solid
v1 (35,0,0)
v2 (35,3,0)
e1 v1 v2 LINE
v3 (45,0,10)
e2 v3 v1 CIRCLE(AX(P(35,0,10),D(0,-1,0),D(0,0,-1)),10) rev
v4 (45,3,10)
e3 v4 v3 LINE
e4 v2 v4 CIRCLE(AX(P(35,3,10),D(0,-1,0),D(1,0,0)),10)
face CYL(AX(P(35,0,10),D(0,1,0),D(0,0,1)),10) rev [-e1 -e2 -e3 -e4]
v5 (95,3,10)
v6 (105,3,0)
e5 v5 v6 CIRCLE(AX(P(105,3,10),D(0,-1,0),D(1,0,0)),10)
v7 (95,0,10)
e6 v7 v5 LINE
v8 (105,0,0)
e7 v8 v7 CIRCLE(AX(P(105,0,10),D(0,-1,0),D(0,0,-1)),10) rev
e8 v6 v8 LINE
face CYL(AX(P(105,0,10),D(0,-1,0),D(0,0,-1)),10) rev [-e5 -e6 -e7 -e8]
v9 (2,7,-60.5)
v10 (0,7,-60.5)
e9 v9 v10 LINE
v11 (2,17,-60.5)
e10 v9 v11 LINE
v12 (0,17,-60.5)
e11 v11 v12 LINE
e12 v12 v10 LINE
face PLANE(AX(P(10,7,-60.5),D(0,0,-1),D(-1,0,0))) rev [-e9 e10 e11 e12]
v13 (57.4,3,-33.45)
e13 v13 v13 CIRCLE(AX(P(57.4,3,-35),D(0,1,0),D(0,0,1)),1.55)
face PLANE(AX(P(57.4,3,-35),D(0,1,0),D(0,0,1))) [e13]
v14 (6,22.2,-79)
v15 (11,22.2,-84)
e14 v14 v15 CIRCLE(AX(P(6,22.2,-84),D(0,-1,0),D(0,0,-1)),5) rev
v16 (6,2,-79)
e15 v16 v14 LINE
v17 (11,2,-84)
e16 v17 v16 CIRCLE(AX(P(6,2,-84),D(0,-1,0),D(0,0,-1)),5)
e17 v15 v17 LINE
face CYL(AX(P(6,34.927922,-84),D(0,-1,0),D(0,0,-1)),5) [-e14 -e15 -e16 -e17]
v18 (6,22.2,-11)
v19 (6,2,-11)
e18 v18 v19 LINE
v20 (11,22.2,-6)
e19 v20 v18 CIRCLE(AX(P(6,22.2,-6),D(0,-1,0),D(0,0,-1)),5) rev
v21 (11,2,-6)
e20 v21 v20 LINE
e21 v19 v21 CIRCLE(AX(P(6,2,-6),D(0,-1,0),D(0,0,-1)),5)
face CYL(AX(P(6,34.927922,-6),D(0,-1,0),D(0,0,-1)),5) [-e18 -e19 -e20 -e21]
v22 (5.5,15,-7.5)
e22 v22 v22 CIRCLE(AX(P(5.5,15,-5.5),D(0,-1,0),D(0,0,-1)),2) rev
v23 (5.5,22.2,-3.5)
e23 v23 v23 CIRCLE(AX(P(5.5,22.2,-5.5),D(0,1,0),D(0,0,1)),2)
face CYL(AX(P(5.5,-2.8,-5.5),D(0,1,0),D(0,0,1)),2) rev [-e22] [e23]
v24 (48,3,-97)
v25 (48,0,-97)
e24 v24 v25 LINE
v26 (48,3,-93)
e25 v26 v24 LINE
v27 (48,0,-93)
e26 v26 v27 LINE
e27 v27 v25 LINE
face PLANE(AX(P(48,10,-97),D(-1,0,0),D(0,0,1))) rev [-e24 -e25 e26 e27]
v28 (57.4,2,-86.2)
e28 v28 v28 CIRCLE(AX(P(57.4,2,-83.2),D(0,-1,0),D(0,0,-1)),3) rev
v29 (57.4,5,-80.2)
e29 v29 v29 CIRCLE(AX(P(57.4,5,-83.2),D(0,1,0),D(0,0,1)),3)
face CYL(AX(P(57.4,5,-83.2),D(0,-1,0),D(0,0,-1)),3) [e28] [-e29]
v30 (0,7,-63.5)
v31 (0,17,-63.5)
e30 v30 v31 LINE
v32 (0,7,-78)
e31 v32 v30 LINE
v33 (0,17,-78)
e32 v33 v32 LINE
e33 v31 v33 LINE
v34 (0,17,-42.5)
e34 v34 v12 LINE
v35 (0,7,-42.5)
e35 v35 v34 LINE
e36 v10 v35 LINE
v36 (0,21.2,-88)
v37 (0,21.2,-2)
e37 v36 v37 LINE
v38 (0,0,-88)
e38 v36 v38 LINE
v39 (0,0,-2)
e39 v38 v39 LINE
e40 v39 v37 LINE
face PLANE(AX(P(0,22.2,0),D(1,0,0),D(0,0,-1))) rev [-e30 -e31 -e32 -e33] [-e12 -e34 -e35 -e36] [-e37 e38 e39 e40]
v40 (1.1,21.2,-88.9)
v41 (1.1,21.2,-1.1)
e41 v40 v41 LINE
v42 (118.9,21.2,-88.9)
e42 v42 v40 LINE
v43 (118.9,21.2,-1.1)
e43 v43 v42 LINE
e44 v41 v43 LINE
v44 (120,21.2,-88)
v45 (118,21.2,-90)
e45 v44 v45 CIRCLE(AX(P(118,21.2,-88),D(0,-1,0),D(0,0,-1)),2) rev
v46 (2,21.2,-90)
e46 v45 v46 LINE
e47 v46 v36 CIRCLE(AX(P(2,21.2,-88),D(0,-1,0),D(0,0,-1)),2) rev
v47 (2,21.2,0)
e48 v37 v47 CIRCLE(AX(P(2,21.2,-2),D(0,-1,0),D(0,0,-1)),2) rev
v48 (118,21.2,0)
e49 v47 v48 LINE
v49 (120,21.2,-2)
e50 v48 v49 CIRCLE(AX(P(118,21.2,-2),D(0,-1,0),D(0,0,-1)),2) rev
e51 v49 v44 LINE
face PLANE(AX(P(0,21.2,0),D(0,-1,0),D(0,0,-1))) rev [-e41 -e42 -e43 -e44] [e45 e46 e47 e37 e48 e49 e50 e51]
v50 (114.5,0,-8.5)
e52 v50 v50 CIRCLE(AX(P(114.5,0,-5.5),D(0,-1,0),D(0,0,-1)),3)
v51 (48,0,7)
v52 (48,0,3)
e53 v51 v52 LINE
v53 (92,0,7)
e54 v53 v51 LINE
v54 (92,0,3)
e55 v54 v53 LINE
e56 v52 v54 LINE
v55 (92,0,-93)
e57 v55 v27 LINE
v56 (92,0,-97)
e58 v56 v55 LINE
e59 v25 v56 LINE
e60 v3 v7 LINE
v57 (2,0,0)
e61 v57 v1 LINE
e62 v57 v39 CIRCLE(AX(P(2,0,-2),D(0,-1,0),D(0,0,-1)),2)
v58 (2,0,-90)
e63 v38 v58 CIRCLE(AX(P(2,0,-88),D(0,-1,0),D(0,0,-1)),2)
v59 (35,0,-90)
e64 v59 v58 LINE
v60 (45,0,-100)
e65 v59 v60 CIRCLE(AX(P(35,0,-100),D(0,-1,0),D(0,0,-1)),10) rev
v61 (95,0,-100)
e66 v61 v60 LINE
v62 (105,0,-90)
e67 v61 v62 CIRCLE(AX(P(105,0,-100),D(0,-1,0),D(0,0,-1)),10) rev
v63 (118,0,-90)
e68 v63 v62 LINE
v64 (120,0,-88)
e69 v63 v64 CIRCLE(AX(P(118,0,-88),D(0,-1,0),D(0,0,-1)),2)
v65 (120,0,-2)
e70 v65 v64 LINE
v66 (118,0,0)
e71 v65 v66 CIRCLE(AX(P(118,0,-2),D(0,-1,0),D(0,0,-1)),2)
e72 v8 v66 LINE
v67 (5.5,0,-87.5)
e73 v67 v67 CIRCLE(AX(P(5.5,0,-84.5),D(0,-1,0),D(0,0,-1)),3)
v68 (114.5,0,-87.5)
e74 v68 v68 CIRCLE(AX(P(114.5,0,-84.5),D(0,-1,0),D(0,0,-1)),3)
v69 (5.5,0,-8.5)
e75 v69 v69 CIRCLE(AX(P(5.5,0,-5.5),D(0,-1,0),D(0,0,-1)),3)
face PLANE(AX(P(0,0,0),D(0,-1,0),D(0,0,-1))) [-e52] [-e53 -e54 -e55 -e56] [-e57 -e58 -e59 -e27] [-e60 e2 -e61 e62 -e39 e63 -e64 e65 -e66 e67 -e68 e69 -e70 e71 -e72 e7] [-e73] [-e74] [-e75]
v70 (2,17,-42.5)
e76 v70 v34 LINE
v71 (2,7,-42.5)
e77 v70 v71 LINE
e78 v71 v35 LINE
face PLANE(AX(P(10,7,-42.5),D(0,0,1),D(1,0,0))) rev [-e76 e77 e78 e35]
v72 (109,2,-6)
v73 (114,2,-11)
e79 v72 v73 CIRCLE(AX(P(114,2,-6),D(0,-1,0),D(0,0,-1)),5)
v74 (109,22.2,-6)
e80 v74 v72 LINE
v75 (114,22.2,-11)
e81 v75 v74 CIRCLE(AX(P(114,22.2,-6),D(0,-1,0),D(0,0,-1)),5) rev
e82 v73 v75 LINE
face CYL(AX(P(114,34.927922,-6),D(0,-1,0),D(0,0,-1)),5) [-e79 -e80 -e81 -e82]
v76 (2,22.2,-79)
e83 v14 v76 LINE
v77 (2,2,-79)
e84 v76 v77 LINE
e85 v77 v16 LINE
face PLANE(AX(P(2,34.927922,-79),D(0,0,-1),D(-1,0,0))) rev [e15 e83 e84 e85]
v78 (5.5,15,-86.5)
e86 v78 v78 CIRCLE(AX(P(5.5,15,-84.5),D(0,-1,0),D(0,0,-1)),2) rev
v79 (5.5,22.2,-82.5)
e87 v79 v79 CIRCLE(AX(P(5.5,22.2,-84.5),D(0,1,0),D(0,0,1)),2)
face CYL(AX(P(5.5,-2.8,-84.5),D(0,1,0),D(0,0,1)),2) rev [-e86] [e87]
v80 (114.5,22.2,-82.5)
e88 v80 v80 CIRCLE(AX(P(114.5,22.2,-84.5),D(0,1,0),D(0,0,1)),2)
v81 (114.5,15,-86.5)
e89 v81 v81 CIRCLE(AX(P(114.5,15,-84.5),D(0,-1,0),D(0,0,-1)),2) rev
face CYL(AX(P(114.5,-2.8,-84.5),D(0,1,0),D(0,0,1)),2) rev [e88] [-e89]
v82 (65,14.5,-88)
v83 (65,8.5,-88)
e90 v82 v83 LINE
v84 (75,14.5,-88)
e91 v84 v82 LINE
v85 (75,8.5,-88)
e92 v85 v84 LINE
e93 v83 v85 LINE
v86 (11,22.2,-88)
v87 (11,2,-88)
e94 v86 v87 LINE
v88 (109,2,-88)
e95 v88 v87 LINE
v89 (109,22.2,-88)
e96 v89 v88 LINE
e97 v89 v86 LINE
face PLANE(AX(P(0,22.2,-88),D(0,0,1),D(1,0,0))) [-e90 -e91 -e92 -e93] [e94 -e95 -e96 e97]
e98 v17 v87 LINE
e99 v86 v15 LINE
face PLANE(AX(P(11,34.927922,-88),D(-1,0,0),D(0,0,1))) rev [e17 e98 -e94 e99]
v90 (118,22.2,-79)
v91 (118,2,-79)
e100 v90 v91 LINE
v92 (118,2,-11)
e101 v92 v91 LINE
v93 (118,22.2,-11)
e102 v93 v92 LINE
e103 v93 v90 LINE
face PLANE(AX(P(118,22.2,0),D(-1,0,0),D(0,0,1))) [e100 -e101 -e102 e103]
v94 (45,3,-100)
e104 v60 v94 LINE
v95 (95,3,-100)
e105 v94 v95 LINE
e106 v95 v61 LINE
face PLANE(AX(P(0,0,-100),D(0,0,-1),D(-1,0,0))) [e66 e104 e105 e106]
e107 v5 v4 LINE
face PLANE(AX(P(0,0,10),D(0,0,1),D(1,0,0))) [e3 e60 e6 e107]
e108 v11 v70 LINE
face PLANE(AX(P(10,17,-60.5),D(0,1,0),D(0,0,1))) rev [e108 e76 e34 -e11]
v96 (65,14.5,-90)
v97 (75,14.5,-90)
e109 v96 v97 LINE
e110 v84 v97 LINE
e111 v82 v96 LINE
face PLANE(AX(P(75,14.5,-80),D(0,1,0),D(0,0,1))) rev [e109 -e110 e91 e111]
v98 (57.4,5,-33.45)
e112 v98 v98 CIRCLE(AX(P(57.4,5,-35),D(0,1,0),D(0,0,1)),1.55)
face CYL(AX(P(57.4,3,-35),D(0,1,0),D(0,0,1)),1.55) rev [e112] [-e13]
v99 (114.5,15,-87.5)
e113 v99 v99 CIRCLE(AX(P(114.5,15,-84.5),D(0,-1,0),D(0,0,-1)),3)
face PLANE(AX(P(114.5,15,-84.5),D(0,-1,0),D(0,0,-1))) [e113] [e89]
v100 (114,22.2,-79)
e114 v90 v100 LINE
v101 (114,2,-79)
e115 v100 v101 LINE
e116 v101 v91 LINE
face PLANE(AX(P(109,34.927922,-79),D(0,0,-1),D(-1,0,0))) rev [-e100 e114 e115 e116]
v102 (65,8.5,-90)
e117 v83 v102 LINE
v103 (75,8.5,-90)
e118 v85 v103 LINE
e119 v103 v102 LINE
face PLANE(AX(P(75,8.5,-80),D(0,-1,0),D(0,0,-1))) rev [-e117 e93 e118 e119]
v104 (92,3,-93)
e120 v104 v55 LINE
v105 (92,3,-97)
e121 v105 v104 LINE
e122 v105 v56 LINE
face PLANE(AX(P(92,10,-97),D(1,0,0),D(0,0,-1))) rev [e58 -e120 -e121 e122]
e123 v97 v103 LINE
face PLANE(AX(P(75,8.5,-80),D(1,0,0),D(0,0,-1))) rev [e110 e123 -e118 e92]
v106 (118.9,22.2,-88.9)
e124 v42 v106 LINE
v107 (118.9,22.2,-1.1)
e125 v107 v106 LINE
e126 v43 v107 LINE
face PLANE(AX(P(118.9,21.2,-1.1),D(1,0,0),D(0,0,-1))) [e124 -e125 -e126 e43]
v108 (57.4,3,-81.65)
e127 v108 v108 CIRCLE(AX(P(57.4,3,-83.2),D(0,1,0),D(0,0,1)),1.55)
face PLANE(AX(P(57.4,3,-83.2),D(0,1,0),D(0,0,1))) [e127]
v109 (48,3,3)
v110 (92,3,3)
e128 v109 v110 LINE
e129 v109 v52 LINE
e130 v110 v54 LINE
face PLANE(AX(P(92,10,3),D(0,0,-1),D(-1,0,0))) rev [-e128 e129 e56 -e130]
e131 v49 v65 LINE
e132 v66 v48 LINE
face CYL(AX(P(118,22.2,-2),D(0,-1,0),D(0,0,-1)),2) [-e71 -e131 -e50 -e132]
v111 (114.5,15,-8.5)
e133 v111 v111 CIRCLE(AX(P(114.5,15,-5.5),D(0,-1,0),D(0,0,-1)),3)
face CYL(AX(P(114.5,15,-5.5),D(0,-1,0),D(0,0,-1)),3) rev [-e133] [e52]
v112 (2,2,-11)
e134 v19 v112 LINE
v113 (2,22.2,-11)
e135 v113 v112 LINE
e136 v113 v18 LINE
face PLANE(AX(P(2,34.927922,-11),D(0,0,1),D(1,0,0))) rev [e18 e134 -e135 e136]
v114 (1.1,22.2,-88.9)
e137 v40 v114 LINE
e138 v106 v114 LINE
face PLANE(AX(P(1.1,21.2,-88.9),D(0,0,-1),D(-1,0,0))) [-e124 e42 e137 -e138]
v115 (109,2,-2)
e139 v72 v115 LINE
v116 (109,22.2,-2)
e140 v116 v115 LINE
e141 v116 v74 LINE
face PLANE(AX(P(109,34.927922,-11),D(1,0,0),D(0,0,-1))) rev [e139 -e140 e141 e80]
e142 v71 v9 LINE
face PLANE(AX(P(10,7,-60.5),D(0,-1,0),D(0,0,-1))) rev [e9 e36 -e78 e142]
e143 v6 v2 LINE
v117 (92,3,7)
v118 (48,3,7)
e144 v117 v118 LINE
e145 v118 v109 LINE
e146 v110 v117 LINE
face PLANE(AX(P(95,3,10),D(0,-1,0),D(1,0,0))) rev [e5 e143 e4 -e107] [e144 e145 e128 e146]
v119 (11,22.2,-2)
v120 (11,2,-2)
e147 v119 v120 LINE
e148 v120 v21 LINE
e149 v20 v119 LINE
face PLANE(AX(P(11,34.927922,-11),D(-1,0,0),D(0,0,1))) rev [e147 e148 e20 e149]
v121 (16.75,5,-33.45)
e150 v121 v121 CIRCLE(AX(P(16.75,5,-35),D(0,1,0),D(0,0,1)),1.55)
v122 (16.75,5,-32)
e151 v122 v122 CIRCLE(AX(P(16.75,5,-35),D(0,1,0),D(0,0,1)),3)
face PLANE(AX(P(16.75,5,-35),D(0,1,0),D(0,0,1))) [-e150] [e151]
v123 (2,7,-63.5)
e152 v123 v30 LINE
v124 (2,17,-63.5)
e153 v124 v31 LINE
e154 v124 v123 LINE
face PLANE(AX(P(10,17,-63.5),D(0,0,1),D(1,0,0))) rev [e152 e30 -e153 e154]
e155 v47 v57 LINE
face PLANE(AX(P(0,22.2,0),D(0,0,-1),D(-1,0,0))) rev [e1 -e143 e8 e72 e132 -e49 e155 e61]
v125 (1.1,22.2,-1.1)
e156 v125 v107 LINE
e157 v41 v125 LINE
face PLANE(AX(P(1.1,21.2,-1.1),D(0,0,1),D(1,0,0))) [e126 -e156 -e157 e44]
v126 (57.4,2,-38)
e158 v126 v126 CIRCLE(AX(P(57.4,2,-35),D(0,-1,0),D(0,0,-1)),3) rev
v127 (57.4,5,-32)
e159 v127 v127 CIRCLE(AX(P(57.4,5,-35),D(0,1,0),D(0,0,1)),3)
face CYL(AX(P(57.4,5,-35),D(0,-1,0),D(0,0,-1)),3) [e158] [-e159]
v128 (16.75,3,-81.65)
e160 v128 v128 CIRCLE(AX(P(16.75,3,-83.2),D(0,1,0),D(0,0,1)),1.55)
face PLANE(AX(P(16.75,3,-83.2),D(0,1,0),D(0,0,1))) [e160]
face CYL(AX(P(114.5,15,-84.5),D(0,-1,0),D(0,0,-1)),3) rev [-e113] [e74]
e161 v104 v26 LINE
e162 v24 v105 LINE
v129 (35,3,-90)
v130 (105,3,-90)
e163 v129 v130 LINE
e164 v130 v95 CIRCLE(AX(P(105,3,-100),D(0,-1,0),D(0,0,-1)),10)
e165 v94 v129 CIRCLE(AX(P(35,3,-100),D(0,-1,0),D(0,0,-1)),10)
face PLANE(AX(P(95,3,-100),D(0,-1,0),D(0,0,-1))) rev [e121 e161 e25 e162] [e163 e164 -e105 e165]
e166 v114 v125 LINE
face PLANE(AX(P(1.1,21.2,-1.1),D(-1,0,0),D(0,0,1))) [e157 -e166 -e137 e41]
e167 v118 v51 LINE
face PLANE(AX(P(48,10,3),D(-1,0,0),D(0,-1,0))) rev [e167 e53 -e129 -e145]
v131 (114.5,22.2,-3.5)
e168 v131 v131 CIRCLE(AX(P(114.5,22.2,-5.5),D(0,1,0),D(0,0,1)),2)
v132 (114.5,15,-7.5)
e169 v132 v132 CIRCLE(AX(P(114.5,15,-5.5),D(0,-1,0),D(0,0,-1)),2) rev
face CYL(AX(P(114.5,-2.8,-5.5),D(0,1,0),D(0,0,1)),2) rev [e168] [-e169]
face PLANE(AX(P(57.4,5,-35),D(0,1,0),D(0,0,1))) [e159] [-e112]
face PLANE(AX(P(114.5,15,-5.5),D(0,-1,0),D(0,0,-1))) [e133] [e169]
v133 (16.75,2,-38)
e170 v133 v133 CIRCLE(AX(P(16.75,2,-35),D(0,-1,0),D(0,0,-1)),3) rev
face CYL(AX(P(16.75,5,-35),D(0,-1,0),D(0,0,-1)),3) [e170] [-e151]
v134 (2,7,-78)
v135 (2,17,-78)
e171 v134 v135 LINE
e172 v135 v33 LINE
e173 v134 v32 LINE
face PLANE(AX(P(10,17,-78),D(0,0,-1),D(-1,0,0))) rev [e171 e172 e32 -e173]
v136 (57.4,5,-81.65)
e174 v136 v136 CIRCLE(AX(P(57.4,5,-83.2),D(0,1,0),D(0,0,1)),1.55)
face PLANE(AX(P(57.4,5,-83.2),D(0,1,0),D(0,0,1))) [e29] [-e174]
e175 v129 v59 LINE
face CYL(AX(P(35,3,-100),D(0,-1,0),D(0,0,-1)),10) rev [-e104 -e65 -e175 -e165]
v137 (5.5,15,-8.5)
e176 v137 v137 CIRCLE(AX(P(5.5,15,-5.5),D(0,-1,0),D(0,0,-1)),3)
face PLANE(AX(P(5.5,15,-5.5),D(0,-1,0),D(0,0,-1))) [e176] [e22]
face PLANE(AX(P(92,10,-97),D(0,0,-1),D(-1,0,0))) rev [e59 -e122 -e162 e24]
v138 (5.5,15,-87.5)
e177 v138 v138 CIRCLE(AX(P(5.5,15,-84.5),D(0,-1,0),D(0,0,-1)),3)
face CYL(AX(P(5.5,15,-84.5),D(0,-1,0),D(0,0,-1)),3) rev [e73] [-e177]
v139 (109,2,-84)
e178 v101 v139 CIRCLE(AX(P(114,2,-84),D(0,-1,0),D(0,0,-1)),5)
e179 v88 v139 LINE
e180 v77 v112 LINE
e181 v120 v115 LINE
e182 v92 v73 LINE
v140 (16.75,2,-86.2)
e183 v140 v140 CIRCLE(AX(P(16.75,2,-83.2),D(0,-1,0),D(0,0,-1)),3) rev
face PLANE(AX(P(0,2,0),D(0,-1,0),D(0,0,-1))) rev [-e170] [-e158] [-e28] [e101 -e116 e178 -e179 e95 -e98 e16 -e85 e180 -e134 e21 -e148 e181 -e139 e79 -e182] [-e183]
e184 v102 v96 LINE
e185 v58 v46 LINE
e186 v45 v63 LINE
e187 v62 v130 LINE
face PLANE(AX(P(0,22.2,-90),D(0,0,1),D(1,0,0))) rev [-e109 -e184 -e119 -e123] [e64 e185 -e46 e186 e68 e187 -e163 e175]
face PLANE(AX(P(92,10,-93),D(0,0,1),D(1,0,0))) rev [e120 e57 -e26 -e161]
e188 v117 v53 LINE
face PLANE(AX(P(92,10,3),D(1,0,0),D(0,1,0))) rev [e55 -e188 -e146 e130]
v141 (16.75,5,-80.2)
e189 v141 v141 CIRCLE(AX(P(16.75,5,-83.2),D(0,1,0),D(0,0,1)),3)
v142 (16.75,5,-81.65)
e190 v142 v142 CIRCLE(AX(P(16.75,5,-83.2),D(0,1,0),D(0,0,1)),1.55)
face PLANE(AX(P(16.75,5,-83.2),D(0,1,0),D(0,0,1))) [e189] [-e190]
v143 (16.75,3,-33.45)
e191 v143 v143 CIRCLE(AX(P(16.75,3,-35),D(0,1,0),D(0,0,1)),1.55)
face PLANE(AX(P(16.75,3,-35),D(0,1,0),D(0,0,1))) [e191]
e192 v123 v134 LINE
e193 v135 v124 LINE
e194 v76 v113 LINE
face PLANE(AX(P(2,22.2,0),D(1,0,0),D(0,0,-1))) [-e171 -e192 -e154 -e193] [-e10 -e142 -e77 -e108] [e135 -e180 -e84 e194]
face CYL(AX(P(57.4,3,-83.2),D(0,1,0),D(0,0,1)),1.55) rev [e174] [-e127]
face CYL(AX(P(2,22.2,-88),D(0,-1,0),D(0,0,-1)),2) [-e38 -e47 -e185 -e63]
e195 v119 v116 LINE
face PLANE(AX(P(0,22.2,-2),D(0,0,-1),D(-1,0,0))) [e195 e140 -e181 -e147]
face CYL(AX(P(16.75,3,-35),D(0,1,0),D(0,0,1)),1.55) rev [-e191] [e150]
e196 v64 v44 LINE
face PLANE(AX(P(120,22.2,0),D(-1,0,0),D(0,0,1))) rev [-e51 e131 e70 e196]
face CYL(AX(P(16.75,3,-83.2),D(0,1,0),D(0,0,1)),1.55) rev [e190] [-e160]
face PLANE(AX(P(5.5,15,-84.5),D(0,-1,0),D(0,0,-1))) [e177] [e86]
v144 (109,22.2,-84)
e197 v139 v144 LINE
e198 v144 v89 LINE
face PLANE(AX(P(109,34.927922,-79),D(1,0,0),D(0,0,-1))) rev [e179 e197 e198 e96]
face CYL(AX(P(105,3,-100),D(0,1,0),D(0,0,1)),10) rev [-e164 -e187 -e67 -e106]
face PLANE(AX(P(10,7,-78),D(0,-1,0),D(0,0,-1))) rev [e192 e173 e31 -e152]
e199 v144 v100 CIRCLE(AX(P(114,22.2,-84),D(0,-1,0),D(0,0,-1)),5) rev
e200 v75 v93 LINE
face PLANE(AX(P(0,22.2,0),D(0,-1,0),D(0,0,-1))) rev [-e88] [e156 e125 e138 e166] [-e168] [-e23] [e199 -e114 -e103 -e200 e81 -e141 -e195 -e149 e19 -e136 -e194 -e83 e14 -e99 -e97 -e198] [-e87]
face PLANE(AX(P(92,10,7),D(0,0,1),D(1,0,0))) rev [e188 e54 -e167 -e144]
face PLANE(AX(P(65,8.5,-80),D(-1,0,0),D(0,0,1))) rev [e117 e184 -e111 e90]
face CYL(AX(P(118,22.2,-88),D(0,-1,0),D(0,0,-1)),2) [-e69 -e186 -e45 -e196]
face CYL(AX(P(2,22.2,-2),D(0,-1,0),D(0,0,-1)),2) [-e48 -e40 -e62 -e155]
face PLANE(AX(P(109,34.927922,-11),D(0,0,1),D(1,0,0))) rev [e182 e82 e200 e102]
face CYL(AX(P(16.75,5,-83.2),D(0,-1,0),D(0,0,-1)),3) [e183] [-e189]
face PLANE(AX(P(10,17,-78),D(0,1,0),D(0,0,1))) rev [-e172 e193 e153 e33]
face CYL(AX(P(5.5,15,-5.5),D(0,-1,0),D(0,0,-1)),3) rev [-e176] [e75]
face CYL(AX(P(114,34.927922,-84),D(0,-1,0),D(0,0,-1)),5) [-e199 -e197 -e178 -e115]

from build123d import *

# Parameters (mm, degrees)
SKETCH1_W           = 120
SKETCH1_H           = 90
BOSS_EXTRUDE1_DEPTH = 22.2
SHELL1_T            = -2
SKETCH2_W           = 9
SKETCH2_H           = 9
BOSS_EXTRUDE2_DEPTH = 20.2
SKETCH5_W           = 120
SKETCH5_H           = 90
SKETCH5_W_2         = 117.8
SKETCH5_H_2         = 87.8
CUT_EXTRUDE2_DEPTH  = 1
SKETCH6_R           = 2
CUT_EXTRUDE3_DEPTH  = 25
SKETCH13_R          = 3
CUT_EXTRUDE8_DEPTH  = 15
SKETCH14_W          = 50
SKETCH14_H          = 3
BOSS_EXTRUDE4_DEPTH = 10
SKETCH15_W          = 44
SKETCH15_H          = 4
CUT_EXTRUDE9_DEPTH  = 10
SKETCH16_W          = 50
SKETCH16_H          = 3
BOSS_EXTRUDE5_DEPTH = 10
SKETCH17_W          = 44
SKETCH17_H          = 4
CUT_EXTRUDE10_DEPTH = 10
SKETCH22_W          = 14.5
SKETCH22_H          = 10
SKETCH22_W_2        = 18
CUT_EXTRUDE15_DEPTH = 10
SKETCH23_W          = 10
SKETCH23_H          = 6
CUT_EXTRUDE16_DEPTH = 10
FILLET1_R           = 10
FILLET4_R           = 5
FILLET9_R           = 2
SKETCH26_R          = 3
BOSS_EXTRUDE7_DEPTH = 3
SKETCH27_R          = 1.55
CUT_EXTRUDE17_DEPTH = 2


with BuildPart() as part:
    # Sketch1 → Boss-Extrude1 (new body)
    with BuildSketch(Plane(origin=(0, 0, 0), x_dir=(1, 0, 0), z_dir=(0, 1, 0))):
        with Locations((60, 45)):
            Rectangle(SKETCH1_W, SKETCH1_H)
    extrude(amount=BOSS_EXTRUDE1_DEPTH)

    # Shell1
    shell1_openings = [part.faces().sort_by_distance(p)[0] for p in [
        (60, 22.2, -45),
    ]]
    offset(amount=SHELL1_T, openings=shell1_openings, kind=Kind.INTERSECTION)

    # Sketch2 → Boss-Extrude2 (add)
    with BuildSketch(Plane(origin=(0, 2, 0), x_dir=(1, 0, 0), z_dir=(0, 1, 0))):
        with Locations((6.5, 6.5)):
            Rectangle(SKETCH2_W, SKETCH2_H)
        with Locations((113.5, 83.5)):
            Rectangle(SKETCH2_W, SKETCH2_H)
        with Locations((113.5, 6.5)):
            Rectangle(SKETCH2_W, SKETCH2_H)
        with Locations((6.5, 83.5)):
            Rectangle(SKETCH2_W, SKETCH2_H)
    extrude(amount=BOSS_EXTRUDE2_DEPTH)

    # Sketch5 → Cut-Extrude2 (cut)
    with BuildSketch(Plane(origin=(0, 22.2, 0), x_dir=(1, 0, 0), z_dir=(0, 1, 0))):
        with Locations((60, 45)):
            Rectangle(SKETCH5_W, SKETCH5_H)
        with Locations((60, 45)):
            Rectangle(SKETCH5_W_2, SKETCH5_H_2, mode=Mode.SUBTRACT)
    extrude(amount=-CUT_EXTRUDE2_DEPTH, mode=Mode.SUBTRACT)

    # Sketch6 → Cut-Extrude3 (cut)
    with BuildSketch(Plane(origin=(0, 22.2, 0), x_dir=(1, 0, 0), z_dir=(0, 1, 0))):
        with Locations(Location((114.5, 84.5, 0), (0, 0, 270))):
            Circle(SKETCH6_R)
        with Locations(Location((114.5, 5.5, 0), (0, 0, 270))):
            Circle(SKETCH6_R)
        with Locations(Location((5.5, 84.5, 0), (0, 0, 270))):
            Circle(SKETCH6_R)
        with Locations(Location((5.5, 5.5, 0), (0, 0, 270))):
            Circle(SKETCH6_R)
    extrude(amount=-CUT_EXTRUDE3_DEPTH, mode=Mode.SUBTRACT)

    # Sketch13 → Cut-Extrude8 (cut)
    with BuildSketch(Plane.XZ):
        with Locations(Location((114.5, -5.5, 0), (0, 0, 270))):
            Circle(SKETCH13_R)
        with Locations(Location((114.5, -84.5, 0), (0, 0, 270))):
            Circle(SKETCH13_R)
        with Locations(Location((5.5, -5.5, 0), (0, 0, 270))):
            Circle(SKETCH13_R)
        with Locations(Location((5.5, -84.5, 0), (0, 0, 270))):
            Circle(SKETCH13_R)
    extrude(amount=-CUT_EXTRUDE8_DEPTH, mode=Mode.SUBTRACT)

    # Sketch14 → Boss-Extrude4 (add)
    with BuildSketch(Plane.XY):
        with Locations((70, 1.5)):
            Rectangle(SKETCH14_W, SKETCH14_H)
    extrude(amount=BOSS_EXTRUDE4_DEPTH)

    # Sketch15 → Cut-Extrude9 (cut)
    with BuildSketch(Plane(origin=(0, 0, 0), x_dir=(-1, 0, 0), z_dir=(0, -1, 0))):
        with Locations((-70, -5)):
            Rectangle(SKETCH15_W, SKETCH15_H)
    extrude(amount=-CUT_EXTRUDE9_DEPTH, mode=Mode.SUBTRACT)

    # Sketch16 → Boss-Extrude5 (add)
    with BuildSketch(Plane(origin=(0, 0, -90), x_dir=(-1, 0, 0), z_dir=(0, 0, -1))):
        with Locations((-70, 1.5)):
            Rectangle(SKETCH16_W, SKETCH16_H)
    extrude(amount=BOSS_EXTRUDE5_DEPTH)

    # Sketch17 → Cut-Extrude10 (cut)
    with BuildSketch(Plane(origin=(0, 0, 0), x_dir=(-1, 0, 0), z_dir=(0, -1, 0))):
        with Locations((-70, 95)):
            Rectangle(SKETCH17_W, SKETCH17_H)
    extrude(amount=-CUT_EXTRUDE10_DEPTH, mode=Mode.SUBTRACT)

    # Sketch22 → Cut-Extrude15 (cut)
    with BuildSketch(Plane.ZY):
        with Locations((-70.75, 12)):
            Rectangle(SKETCH22_W, SKETCH22_H)
        with Locations((-51.5, 12)):
            Rectangle(SKETCH22_W_2, SKETCH22_H)
    extrude(amount=-CUT_EXTRUDE15_DEPTH, mode=Mode.SUBTRACT)

    # Sketch23 → Cut-Extrude16 (cut)
    with BuildSketch(Plane(origin=(0, 0, -90), x_dir=(-1, 0, 0), z_dir=(0, 0, -1))):
        with Locations((-70, 11.5)):
            Rectangle(SKETCH23_W, SKETCH23_H)
    extrude(amount=-CUT_EXTRUDE16_DEPTH, mode=Mode.SUBTRACT)

    # Fillet1
    fillet1_edges = [part.edges().sort_by_distance(p)[0] for p in [
        (95, 1.5, -90),
        (95, 1.5, 0),
        (45, 1.5, 0),
        (45, 1.5, -90),
    ]]
    fillet(fillet1_edges, radius=FILLET1_R - 0.0001)  # a hair under: the kernel refuses the full size

    # Fillet4
    fillet4_edges = [part.edges().sort_by_distance(p)[0] for p in [
        (11, 12.1, -11),
        (109, 12.1, -79),
        (11, 12.1, -79),
        (109, 12.1, -11),
    ]]
    fillet(fillet4_edges, radius=FILLET4_R)

    # Fillet9
    fillet9_edges = [part.edges().sort_by_distance(p)[0] for p in [
        (0, 10.6, -90),
        (120, 10.6, -90),
        (120, 10.6, 0),
        (0, 10.6, 0),
    ]]
    fillet(fillet9_edges, radius=FILLET9_R)

    # Sketch26 → Boss-Extrude7 (add)
    with BuildSketch(Plane(origin=(0, 2, 0), x_dir=(1, 0, 0), z_dir=(0, 1, 0))):
        with Locations(Location((16.75, 83.2, 0), (0, 0, 90))):
            Circle(SKETCH26_R)
        with Locations(Location((16.75, 35, 0), (0, 0, 90))):
            Circle(SKETCH26_R)
        with Locations(Location((57.4, 35, 0), (0, 0, 90))):
            Circle(SKETCH26_R)
        with Locations(Location((57.4, 83.2, 0), (0, 0, 90))):
            Circle(SKETCH26_R)
    extrude(amount=BOSS_EXTRUDE7_DEPTH)

    # Sketch27 → Cut-Extrude17 (cut)
    with BuildSketch(Plane(origin=(0, 5, 0), x_dir=(1, 0, 0), z_dir=(0, 1, 0))):
        with Locations(Location((57.4, 83.2, 0), (0, 0, 270))):
            Circle(SKETCH27_R)
        with Locations(Location((57.4, 35, 0), (0, 0, 270))):
            Circle(SKETCH27_R)
        with Locations(Location((16.75, 35, 0), (0, 0, 270))):
            Circle(SKETCH27_R)
        with Locations(Location((16.75, 83.2, 0), (0, 0, 270))):
            Circle(SKETCH27_R)
    extrude(amount=-CUT_EXTRUDE17_DEPTH, mode=Mode.SUBTRACT)


solid = part.part
